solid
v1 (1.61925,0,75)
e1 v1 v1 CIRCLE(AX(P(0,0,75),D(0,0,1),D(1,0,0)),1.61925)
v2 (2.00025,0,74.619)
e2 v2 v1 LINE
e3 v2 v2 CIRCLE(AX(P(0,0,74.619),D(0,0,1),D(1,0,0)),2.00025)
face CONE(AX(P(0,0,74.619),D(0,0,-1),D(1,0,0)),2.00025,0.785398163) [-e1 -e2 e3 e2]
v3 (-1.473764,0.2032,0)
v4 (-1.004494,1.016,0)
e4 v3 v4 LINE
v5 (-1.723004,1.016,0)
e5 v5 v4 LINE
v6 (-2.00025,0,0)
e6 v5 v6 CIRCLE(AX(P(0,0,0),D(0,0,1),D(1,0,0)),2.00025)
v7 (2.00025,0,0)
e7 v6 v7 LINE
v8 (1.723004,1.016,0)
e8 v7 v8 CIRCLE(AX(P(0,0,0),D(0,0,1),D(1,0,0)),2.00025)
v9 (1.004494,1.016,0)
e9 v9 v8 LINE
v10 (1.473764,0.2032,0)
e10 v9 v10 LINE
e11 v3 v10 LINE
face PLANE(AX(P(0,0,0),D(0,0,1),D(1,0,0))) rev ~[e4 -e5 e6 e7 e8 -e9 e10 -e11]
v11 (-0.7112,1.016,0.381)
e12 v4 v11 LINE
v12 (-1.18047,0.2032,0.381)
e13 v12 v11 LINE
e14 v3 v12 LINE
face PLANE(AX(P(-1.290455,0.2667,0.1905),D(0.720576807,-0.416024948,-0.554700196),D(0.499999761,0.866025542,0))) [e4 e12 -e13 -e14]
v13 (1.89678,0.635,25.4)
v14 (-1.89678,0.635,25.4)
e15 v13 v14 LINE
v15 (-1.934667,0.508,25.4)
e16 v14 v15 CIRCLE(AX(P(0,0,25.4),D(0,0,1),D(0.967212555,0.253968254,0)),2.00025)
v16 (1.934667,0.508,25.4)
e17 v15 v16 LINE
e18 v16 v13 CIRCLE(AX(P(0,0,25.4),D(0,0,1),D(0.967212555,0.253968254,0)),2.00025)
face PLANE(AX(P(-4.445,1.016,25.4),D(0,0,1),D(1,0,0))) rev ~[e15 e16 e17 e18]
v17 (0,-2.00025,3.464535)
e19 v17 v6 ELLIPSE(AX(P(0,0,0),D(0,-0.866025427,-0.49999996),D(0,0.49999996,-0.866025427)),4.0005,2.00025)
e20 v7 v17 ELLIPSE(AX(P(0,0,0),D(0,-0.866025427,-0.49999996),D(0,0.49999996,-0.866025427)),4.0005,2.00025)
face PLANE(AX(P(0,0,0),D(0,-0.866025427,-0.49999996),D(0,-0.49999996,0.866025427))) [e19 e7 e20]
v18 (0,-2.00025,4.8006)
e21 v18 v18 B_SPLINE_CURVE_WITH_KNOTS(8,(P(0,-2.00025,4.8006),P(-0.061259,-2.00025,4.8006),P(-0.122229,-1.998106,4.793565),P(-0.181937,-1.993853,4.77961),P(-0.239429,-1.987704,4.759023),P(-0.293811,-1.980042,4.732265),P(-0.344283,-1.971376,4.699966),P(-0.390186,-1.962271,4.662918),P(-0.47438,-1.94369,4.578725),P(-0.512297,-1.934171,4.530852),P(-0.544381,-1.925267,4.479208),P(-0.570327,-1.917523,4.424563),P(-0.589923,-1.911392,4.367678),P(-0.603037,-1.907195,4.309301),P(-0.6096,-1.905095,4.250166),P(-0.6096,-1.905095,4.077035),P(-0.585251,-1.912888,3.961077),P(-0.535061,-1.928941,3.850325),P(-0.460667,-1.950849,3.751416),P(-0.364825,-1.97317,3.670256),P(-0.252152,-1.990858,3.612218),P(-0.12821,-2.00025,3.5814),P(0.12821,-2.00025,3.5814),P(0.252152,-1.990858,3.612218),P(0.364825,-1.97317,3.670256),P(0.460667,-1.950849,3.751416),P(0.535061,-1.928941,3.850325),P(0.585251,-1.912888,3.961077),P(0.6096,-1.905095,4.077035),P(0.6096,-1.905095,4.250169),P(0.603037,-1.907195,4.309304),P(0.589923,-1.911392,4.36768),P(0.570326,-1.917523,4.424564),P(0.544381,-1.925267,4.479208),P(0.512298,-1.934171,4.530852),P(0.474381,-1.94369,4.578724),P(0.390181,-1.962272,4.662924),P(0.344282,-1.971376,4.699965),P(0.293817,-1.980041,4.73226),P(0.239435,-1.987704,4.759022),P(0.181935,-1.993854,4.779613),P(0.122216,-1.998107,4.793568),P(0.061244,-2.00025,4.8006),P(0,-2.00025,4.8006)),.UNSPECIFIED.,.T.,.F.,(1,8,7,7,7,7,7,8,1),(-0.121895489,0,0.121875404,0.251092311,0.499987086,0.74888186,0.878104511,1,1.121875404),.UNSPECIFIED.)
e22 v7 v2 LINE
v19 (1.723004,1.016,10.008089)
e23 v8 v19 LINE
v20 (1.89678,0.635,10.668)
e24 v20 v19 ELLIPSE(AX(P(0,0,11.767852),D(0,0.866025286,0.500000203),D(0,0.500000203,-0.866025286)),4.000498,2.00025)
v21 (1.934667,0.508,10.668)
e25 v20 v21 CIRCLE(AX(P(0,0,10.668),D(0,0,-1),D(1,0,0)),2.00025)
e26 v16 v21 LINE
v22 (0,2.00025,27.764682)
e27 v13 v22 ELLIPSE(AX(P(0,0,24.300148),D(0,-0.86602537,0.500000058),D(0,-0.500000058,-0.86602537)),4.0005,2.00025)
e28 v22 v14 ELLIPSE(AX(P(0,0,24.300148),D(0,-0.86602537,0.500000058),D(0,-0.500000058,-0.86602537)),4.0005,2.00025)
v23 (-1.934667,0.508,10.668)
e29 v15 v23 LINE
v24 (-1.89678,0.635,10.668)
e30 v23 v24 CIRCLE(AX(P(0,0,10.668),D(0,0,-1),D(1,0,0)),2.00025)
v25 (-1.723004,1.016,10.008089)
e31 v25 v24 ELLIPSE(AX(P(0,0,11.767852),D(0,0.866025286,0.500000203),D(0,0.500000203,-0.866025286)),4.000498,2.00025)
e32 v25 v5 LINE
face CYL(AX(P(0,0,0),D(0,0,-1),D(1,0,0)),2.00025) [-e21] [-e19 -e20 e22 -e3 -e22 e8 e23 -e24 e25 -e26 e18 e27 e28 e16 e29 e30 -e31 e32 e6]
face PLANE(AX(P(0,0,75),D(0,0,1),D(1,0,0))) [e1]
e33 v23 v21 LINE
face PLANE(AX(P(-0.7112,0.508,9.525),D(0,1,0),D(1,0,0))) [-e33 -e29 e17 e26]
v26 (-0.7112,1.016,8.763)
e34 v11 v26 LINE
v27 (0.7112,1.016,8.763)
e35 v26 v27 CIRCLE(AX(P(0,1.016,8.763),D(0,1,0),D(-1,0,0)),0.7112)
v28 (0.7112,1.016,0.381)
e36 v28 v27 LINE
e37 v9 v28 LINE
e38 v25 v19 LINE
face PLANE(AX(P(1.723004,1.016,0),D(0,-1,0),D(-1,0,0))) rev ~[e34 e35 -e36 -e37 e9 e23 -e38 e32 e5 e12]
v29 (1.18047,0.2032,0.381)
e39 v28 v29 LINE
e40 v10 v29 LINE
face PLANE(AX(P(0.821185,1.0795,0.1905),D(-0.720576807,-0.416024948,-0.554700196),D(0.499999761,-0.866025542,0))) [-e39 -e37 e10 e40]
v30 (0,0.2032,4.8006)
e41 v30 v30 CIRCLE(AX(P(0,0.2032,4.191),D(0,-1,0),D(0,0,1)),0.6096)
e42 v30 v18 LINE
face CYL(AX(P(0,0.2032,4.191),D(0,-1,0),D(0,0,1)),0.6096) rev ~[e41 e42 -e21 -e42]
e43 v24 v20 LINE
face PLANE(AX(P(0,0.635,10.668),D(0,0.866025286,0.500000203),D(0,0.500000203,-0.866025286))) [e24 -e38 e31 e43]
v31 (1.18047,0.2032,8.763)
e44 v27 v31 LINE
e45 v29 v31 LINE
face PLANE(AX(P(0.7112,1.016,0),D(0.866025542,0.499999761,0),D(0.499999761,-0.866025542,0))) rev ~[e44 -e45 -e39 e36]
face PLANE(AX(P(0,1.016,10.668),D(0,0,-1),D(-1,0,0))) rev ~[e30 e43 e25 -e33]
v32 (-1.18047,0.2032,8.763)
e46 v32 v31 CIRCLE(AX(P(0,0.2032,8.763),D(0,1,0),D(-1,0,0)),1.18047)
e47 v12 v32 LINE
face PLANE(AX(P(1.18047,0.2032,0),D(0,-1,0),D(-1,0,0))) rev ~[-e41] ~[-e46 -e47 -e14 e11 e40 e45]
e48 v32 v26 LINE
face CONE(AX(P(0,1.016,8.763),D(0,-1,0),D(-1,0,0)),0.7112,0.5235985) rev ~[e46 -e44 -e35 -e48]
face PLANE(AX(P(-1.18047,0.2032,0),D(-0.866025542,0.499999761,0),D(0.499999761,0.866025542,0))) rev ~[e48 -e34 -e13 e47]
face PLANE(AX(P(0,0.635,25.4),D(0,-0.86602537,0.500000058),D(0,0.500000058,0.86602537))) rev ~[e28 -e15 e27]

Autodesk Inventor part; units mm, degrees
ref_plane "YZ Plane" through (0, 0, 0) normal (1, 0, 0) x (0, 1, 0)
ref_plane "XZ Plane" through (0, 0, 0) normal (0, 1, 0) x (-1, 0, 0)
ref_plane "XY Plane" through (0, 0, 0) normal (0, 0, 1) x (1, 0, 0)
sketch "Sketch1" plane through (0, 0, 0) normal (0, 0, 1) x (1, 0, 0)
  circle A0 centre (0, 0) radius 2.00025
  dimension "d0" = 4.0005
extrude "Extrusion1" add sketch "Sketch1" along normal blind 75
sketch "Sketch2" plane through (0, 0, 0) normal (0, 0, 1) x (1, 0, 0)
  circle A0 centre (0, 0) radius 2.00025
  line L0 (1.353027, 1.4732) -> (-1.353027, 1.4732)
  line L1 (0, 2.80035) -> (0, -2.80035)
  line L2 (-2.80035, 0) -> (2.80035, 0)
  line L3 (1.723004, 1.016) -> (-1.723004, 1.016)
  line L4 (0.7112, 1.016) -> (1.18047, 0.2032)
  line L5 (1.18047, 0.2032) -> (-1.18047, 0.2032)
  line L6 (-1.18047, 0.2032) -> (-0.7112, 1.016)
  line L7 (0, 0) -> (0, 2.00025)
  dimension "d6" = 1.016
  dimension "d9" = 60
  dimension "d10" = 1.4224
  dimension "d11" = 0.8128
  dimension "d40" = 0.4572
extrude "Extrusion3" cut sketch "Sketch2" along normal blind 9.525 contours L3 L1 L0 A0 | L1 L3 A0 L0
extrude "Extrusion4" cut sketch "Sketch2" along normal blind 8.763 contours L4 L5 L1 L3 | L5 L6 L3 L1
sketch "Sketch3" plane through (-1.18047, 0.2032, 9.525) normal (0, 1, 0) x (1, 0, 0)
  line L0 (0, 9.525) -> (2.360941, 9.525)
  line L1 (1.18047, 24.525) -> (1.18047, -80.475)
  point P0 (1.18047, 9.525)
  point P1 (1.18047, 5.334)
  dimension "d14" = 4.191
hole "Hole1" at (0, 0.2032, 4.191) direction (0, -1, 0) diameter 1.2192 end through all thread size "M1.6x0.35" class "6H" standard "ANSI Metric M Profile"
sketch "Sketch4" plane through (0, 0, 0) normal (1, 0, 0) x (0, 1, 0)
  line L0 (0, 120) -> (0, -20)
  line L1 (-2.00025, 0) -> (-2.00025, 75)
  line L2 (0, 0) -> (-2.00025, 3.464535)
  line L3 (-2.00025, 3.464535) -> (-2.00025, 0)
  line L4 (-2.00025, 0) -> (0, 0)
  dimension "d23" = 30
extrude "Extrusion5" cut sketch "Sketch4" along normal mid plane 12.7
chamfer "Chamfer1" distance 0.254 distance2 0.381 1 edges at (-0.9458, 0.6096, 0) measured on face at (-1.2049, 0.7451, 0)
chamfer "Chamfer2" distance 0.254 distance2 0.381 1 edges at (0.9458, 0.6096, 0) measured on face at (1.2049, 0.7451, 0)
chamfer "Chamfer3" distance 0.381 angle 45 1 edges at (-2.0003, 0, 75)
extrude "Extrusion7" cut sketch "Sketch2" along normal blind 25.4 contours L3 L1 L0 A0 | L0 L1 A0 | L1 L0 A0 | L1 L3 A0 L0
sketch "Sketch6" plane through (-0.7112, 1.016, 9.525) normal (0, 1, 0) x (1, 0, 0)
  line L0 (-1.011804, -15.875) -> (2.434204, -15.875)
  line L1 (0.7112, 24.525) -> (0.7112, -80.475)
  line L2 (6.9342, 9.525) -> (-5.5118, 9.525)
  line L3 (5.1562, -1.143) -> (-3.7338, -1.143)
  line L4 (-3.7338, -1.143) -> (-3.7338, -15.875)
  line L5 (-3.7338, -15.875) -> (5.1562, -15.875)
  line L6 (5.1562, -15.875) -> (5.1562, -1.143)
  line L7 (5.1562, -1.143) -> (-3.7338, -15.875) construction
  line L8 (-3.7338, -1.143) -> (5.1562, -15.875) construction
  point P0 (0.7112, 9.525)
  point P1 (0.7112, -8.509)
  dimension "d43" = 0
  dimension "d45" = 8.89
  dimension "d68" = 10.668
  dimension "d69" = 14.732
extrude "Extrusion8" cut sketch "Sketch6" against normal blind 0.508
sketch "Sketch11" plane through (0, 0, 0) normal (1, 0, 0) x (0, 1, 0)
  line L0 (0.508, 10.668) -> (0.508, 25.4)
  line L1 (2.00025, 25.4) -> (2.00025, 74.619)
  line L2 (0.635, 25.4) -> (2.00025, 27.764682)
  line L3 (0.508, 10.668) -> (1.016, 10.668)
  line L4 (-0.40005, 0) -> (2.4003, 0)
  line L5 (0.635, 10.668) -> (1.016, 10.008089)
  line L6 (1.016, 10.008089) -> (1.016, 10.668)
  line L7 (0.635, 10.668) -> (1.016, 10.668)
  line L8 (2.00025, 27.764682) -> (2.00025, 25.4)
  line L9 (2.00025, 25.4) -> (0.508, 25.4)
  line L10 (0.635, 25.4) -> (2.00025, 25.4)
  point P0 (0, 0)
  dimension "d56" = 0.127
  dimension "d57" = 10.668
  dimension "d58" = 0.127
  dimension "d59" = 30
  dimension "d64" = 30
extrude "Extrusion10" cut sketch "Sketch11" along normal mid plane 6.35
sketch "Sketch12" plane through (-1.473764, 0.2032, 0) normal (0, 1, 0) x (1, 0, 0)
  circle A0 centre (1.473764, -4.191) radius 0.6096
  circle A1 centre (1.473764, -4.191) radius 0.8
  circle A2 centre (1.473764, -4.191) radius 0.7
  point P0 (1.473764, 0)
  dimension "d65" = 1.6
  dimension "d66" = 1.4
sketch "Sketch14" plane through (0, 0, 8.763) normal (0, 0, -1) x (-1, 0, 0)
  line L0 (0.7112, 1.016) -> (1.18047, 0.2032)
  line L1 (-1.473764, 0.2032) -> (1.473764, 0.2032)
  line L2 (0.7112, 1.016) -> (0.7112, 0.2032)
  line L3 (1.18047, 0.2032) -> (-1.18047, 0.2032)
  line L4 (0.7112, 0.2032) -> (1.18047, 0.2032)
  line L5 (0, -2.80035) -> (0, 2.80035)
  line L6 (0, 0.2032) -> (0, 1.016)
  line L7 (0.7112, 1.016) -> (0, 1.016)
  line L8 (0, 1.016) -> (0, 0.2032)
  line L9 (0, 0.2032) -> (0.7112, 0.2032)
  line L10 (0.7112, 0.2032) -> (0.7112, 1.016)
  point P0 (0, 0)
revolve "Revolution1" cut sketch "Sketch14" angle 360 about axis through (0, 0, 8.763) along (0, 1, 0)
properties part number "J008040" material "ALUMINUM, 7075-T651"
